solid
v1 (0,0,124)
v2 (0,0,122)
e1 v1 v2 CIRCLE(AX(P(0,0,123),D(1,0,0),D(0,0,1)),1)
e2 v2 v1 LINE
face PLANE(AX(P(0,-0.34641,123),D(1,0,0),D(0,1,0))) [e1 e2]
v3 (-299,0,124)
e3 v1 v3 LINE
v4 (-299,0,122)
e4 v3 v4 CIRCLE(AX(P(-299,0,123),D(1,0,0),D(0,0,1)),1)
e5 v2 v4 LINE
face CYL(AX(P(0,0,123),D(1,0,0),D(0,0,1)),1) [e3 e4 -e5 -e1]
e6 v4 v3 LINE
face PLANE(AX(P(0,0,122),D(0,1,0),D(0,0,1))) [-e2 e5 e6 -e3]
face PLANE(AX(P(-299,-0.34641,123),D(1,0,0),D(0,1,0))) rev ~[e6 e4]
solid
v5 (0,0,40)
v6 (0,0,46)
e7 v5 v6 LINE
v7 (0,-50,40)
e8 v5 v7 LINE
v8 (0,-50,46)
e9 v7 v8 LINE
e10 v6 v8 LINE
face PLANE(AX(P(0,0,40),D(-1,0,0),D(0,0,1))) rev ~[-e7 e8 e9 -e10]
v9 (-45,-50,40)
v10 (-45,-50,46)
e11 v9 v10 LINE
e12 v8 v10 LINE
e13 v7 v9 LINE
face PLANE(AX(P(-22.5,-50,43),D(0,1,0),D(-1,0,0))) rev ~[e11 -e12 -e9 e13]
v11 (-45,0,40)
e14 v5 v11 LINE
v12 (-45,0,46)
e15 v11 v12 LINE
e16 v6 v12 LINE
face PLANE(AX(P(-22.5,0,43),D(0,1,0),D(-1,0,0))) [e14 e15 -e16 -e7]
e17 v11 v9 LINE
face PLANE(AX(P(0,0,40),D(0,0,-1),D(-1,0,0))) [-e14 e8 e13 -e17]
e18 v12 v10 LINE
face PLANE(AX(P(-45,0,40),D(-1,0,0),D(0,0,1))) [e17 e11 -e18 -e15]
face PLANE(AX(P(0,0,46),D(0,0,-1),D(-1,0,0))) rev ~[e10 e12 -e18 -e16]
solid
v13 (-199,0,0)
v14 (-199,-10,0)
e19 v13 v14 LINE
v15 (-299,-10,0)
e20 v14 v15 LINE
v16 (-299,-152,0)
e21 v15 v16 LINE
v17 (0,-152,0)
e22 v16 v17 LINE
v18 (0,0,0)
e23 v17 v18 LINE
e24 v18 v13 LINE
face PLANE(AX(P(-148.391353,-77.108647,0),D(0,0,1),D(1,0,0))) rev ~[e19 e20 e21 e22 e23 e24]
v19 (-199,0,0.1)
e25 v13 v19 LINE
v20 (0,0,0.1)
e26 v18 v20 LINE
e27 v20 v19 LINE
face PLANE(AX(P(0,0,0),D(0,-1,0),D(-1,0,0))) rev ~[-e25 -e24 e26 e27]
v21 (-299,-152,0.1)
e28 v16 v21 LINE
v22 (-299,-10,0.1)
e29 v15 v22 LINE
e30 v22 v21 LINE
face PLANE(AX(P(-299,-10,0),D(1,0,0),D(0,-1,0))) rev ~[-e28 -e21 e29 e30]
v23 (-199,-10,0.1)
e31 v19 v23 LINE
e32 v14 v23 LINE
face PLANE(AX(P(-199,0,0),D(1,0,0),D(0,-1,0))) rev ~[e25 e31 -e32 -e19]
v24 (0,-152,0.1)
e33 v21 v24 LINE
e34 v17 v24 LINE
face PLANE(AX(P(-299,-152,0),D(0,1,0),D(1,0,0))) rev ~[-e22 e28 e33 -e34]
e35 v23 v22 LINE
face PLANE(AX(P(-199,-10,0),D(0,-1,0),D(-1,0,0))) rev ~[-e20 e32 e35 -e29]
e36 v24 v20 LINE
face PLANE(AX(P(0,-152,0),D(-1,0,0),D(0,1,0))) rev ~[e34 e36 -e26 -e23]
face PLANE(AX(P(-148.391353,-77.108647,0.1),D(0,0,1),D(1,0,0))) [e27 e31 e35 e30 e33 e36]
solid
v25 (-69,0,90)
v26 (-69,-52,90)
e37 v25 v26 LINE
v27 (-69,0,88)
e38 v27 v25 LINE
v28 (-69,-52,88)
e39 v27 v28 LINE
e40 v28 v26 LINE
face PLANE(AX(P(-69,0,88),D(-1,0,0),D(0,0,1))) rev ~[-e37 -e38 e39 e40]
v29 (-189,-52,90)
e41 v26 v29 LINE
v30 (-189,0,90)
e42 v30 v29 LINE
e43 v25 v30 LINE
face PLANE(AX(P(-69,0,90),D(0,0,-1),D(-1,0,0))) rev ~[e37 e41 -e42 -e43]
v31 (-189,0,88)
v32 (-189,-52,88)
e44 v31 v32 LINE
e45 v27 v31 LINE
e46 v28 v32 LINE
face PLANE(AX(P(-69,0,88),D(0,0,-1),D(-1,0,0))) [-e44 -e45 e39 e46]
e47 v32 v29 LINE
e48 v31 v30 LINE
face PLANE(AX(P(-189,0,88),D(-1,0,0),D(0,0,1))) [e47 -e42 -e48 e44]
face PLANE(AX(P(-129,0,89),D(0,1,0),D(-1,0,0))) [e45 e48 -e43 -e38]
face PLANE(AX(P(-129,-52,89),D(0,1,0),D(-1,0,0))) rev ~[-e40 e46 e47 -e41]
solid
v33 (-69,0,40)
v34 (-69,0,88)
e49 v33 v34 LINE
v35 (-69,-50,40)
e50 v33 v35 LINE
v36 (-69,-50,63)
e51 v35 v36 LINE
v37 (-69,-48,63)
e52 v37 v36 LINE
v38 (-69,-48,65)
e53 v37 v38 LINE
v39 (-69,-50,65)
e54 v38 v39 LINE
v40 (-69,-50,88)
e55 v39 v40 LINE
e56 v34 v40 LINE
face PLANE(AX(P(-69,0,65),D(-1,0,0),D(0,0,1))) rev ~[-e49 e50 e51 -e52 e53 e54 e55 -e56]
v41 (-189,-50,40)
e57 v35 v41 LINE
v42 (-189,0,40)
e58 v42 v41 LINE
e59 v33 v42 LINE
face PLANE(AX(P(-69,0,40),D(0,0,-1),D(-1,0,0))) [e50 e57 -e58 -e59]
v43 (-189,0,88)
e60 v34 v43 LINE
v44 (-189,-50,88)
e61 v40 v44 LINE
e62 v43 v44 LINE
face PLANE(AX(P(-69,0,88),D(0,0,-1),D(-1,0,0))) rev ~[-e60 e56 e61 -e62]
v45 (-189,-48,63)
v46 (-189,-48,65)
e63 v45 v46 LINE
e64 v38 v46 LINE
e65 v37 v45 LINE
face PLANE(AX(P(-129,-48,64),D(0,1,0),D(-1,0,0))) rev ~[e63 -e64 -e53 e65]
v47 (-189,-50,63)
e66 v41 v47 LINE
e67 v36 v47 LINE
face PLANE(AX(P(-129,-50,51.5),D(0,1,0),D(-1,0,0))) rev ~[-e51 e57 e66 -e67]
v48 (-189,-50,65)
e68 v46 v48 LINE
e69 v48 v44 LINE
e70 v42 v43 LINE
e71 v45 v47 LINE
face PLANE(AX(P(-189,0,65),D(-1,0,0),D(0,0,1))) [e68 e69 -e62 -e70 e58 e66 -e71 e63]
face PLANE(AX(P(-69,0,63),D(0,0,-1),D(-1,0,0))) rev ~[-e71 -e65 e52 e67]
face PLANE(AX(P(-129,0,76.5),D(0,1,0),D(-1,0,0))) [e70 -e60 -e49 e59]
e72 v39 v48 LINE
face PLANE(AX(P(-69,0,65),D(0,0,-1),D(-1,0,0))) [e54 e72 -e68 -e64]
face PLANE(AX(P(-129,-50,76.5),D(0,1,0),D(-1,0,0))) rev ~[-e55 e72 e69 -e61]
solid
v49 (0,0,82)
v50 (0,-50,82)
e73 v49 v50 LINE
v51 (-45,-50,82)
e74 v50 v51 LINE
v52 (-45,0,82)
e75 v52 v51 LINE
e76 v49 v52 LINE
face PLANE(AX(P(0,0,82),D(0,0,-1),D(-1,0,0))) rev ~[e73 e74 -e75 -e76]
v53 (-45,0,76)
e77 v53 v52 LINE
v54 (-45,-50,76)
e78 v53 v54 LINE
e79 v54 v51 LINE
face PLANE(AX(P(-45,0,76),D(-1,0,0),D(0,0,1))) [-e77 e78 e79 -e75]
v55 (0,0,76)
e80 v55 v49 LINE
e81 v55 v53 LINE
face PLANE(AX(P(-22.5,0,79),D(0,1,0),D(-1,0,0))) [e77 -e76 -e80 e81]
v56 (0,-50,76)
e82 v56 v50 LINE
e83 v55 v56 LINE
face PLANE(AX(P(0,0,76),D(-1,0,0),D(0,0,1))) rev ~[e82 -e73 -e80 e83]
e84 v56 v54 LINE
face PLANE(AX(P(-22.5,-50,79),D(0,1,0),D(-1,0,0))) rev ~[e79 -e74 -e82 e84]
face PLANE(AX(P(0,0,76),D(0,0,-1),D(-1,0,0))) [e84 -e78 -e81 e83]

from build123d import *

# Parameters (mm, degrees)
F2_DEPTH  = 0.1
F3_W      = 120
F3_H      = 2
F4_DEPTH  = 48
F3_H_2    = 23
F5_DEPTH  = 50
F6_DEPTH  = 52
F8_DEPTH  = 299
F3_W_2    = 45
F3_H_3    = 6
F10_DEPTH = 50


# Not quite as in the source:
# - the program builds the solid bodies; features that only make, move or delete a surface that nothing else refers to are left out


with BuildPart() as f2:
    # F0 (on Top) → F2 (new body)
    with BuildSketch(Plane.XY):
        Polygon((0, -52), (0, 0), (-199, 0), (-199, -10), (-299, -10), (-299, -152), (0, -152), align=None)
    extrude(amount=F2_DEPTH)


with BuildPart() as f4:
    # F3 (on face) → F4 (new body)
    with BuildSketch(Plane(origin=(0, 0, 0), x_dir=(-1, 0, 0), z_dir=(0, 1, 0))):
        with Locations((129, 64)):
            Rectangle(F3_W, F3_H)
    extrude(amount=-F4_DEPTH)

    # F3 (on face) → F5 (join)
    with BuildSketch(Plane(origin=(0, 0, 0), x_dir=(-1, 0, 0), z_dir=(0, 1, 0))):
        with Locations((129, 76.5)):
            Rectangle(F3_W, F3_H_2)
        with Locations((129, 51.5)):
            Rectangle(F3_W, F3_H_2)
    extrude(amount=-F5_DEPTH)


with BuildPart() as f6:
    # F3 (on face) → F6 (new body)
    with BuildSketch(Plane(origin=(0, 0, 0), x_dir=(-1, 0, 0), z_dir=(0, 1, 0))):
        with Locations((129, 89)):
            Rectangle(F3_W, F3_H)
    extrude(amount=-F6_DEPTH)


with BuildPart() as f8:
    # F7 (on face) → F8 (new body)
    with BuildSketch(Plane.YZ):
        with BuildLine():
            ThreePointArc((0, 124), (-1, 123), (0, 122))
            Line((0, 122), (0, 124))
        make_face()
    extrude(amount=-F8_DEPTH)


with BuildPart() as f10:
    # F3 (on face) → F10 (new body)
    with BuildSketch(Plane(origin=(0, 0, 0), x_dir=(-1, 0, 0), z_dir=(0, 1, 0))):
        with Locations((22.5, 79)):
            Rectangle(F3_W_2, F3_H_3)
    extrude(amount=-F10_DEPTH)


with BuildPart() as f10b:
    # F3 (on face) → F10, piece 2 (new body)
    with BuildSketch(Plane(origin=(0, 0, 0), x_dir=(-1, 0, 0), z_dir=(0, 1, 0))):
        with Locations((22.5, 43)):
            Rectangle(F3_W_2, F3_H_3)
    extrude(amount=-F10_DEPTH)


solid = Compound([f2.part, f4.part, f6.part, f8.part, f10.part, f10b.part])
